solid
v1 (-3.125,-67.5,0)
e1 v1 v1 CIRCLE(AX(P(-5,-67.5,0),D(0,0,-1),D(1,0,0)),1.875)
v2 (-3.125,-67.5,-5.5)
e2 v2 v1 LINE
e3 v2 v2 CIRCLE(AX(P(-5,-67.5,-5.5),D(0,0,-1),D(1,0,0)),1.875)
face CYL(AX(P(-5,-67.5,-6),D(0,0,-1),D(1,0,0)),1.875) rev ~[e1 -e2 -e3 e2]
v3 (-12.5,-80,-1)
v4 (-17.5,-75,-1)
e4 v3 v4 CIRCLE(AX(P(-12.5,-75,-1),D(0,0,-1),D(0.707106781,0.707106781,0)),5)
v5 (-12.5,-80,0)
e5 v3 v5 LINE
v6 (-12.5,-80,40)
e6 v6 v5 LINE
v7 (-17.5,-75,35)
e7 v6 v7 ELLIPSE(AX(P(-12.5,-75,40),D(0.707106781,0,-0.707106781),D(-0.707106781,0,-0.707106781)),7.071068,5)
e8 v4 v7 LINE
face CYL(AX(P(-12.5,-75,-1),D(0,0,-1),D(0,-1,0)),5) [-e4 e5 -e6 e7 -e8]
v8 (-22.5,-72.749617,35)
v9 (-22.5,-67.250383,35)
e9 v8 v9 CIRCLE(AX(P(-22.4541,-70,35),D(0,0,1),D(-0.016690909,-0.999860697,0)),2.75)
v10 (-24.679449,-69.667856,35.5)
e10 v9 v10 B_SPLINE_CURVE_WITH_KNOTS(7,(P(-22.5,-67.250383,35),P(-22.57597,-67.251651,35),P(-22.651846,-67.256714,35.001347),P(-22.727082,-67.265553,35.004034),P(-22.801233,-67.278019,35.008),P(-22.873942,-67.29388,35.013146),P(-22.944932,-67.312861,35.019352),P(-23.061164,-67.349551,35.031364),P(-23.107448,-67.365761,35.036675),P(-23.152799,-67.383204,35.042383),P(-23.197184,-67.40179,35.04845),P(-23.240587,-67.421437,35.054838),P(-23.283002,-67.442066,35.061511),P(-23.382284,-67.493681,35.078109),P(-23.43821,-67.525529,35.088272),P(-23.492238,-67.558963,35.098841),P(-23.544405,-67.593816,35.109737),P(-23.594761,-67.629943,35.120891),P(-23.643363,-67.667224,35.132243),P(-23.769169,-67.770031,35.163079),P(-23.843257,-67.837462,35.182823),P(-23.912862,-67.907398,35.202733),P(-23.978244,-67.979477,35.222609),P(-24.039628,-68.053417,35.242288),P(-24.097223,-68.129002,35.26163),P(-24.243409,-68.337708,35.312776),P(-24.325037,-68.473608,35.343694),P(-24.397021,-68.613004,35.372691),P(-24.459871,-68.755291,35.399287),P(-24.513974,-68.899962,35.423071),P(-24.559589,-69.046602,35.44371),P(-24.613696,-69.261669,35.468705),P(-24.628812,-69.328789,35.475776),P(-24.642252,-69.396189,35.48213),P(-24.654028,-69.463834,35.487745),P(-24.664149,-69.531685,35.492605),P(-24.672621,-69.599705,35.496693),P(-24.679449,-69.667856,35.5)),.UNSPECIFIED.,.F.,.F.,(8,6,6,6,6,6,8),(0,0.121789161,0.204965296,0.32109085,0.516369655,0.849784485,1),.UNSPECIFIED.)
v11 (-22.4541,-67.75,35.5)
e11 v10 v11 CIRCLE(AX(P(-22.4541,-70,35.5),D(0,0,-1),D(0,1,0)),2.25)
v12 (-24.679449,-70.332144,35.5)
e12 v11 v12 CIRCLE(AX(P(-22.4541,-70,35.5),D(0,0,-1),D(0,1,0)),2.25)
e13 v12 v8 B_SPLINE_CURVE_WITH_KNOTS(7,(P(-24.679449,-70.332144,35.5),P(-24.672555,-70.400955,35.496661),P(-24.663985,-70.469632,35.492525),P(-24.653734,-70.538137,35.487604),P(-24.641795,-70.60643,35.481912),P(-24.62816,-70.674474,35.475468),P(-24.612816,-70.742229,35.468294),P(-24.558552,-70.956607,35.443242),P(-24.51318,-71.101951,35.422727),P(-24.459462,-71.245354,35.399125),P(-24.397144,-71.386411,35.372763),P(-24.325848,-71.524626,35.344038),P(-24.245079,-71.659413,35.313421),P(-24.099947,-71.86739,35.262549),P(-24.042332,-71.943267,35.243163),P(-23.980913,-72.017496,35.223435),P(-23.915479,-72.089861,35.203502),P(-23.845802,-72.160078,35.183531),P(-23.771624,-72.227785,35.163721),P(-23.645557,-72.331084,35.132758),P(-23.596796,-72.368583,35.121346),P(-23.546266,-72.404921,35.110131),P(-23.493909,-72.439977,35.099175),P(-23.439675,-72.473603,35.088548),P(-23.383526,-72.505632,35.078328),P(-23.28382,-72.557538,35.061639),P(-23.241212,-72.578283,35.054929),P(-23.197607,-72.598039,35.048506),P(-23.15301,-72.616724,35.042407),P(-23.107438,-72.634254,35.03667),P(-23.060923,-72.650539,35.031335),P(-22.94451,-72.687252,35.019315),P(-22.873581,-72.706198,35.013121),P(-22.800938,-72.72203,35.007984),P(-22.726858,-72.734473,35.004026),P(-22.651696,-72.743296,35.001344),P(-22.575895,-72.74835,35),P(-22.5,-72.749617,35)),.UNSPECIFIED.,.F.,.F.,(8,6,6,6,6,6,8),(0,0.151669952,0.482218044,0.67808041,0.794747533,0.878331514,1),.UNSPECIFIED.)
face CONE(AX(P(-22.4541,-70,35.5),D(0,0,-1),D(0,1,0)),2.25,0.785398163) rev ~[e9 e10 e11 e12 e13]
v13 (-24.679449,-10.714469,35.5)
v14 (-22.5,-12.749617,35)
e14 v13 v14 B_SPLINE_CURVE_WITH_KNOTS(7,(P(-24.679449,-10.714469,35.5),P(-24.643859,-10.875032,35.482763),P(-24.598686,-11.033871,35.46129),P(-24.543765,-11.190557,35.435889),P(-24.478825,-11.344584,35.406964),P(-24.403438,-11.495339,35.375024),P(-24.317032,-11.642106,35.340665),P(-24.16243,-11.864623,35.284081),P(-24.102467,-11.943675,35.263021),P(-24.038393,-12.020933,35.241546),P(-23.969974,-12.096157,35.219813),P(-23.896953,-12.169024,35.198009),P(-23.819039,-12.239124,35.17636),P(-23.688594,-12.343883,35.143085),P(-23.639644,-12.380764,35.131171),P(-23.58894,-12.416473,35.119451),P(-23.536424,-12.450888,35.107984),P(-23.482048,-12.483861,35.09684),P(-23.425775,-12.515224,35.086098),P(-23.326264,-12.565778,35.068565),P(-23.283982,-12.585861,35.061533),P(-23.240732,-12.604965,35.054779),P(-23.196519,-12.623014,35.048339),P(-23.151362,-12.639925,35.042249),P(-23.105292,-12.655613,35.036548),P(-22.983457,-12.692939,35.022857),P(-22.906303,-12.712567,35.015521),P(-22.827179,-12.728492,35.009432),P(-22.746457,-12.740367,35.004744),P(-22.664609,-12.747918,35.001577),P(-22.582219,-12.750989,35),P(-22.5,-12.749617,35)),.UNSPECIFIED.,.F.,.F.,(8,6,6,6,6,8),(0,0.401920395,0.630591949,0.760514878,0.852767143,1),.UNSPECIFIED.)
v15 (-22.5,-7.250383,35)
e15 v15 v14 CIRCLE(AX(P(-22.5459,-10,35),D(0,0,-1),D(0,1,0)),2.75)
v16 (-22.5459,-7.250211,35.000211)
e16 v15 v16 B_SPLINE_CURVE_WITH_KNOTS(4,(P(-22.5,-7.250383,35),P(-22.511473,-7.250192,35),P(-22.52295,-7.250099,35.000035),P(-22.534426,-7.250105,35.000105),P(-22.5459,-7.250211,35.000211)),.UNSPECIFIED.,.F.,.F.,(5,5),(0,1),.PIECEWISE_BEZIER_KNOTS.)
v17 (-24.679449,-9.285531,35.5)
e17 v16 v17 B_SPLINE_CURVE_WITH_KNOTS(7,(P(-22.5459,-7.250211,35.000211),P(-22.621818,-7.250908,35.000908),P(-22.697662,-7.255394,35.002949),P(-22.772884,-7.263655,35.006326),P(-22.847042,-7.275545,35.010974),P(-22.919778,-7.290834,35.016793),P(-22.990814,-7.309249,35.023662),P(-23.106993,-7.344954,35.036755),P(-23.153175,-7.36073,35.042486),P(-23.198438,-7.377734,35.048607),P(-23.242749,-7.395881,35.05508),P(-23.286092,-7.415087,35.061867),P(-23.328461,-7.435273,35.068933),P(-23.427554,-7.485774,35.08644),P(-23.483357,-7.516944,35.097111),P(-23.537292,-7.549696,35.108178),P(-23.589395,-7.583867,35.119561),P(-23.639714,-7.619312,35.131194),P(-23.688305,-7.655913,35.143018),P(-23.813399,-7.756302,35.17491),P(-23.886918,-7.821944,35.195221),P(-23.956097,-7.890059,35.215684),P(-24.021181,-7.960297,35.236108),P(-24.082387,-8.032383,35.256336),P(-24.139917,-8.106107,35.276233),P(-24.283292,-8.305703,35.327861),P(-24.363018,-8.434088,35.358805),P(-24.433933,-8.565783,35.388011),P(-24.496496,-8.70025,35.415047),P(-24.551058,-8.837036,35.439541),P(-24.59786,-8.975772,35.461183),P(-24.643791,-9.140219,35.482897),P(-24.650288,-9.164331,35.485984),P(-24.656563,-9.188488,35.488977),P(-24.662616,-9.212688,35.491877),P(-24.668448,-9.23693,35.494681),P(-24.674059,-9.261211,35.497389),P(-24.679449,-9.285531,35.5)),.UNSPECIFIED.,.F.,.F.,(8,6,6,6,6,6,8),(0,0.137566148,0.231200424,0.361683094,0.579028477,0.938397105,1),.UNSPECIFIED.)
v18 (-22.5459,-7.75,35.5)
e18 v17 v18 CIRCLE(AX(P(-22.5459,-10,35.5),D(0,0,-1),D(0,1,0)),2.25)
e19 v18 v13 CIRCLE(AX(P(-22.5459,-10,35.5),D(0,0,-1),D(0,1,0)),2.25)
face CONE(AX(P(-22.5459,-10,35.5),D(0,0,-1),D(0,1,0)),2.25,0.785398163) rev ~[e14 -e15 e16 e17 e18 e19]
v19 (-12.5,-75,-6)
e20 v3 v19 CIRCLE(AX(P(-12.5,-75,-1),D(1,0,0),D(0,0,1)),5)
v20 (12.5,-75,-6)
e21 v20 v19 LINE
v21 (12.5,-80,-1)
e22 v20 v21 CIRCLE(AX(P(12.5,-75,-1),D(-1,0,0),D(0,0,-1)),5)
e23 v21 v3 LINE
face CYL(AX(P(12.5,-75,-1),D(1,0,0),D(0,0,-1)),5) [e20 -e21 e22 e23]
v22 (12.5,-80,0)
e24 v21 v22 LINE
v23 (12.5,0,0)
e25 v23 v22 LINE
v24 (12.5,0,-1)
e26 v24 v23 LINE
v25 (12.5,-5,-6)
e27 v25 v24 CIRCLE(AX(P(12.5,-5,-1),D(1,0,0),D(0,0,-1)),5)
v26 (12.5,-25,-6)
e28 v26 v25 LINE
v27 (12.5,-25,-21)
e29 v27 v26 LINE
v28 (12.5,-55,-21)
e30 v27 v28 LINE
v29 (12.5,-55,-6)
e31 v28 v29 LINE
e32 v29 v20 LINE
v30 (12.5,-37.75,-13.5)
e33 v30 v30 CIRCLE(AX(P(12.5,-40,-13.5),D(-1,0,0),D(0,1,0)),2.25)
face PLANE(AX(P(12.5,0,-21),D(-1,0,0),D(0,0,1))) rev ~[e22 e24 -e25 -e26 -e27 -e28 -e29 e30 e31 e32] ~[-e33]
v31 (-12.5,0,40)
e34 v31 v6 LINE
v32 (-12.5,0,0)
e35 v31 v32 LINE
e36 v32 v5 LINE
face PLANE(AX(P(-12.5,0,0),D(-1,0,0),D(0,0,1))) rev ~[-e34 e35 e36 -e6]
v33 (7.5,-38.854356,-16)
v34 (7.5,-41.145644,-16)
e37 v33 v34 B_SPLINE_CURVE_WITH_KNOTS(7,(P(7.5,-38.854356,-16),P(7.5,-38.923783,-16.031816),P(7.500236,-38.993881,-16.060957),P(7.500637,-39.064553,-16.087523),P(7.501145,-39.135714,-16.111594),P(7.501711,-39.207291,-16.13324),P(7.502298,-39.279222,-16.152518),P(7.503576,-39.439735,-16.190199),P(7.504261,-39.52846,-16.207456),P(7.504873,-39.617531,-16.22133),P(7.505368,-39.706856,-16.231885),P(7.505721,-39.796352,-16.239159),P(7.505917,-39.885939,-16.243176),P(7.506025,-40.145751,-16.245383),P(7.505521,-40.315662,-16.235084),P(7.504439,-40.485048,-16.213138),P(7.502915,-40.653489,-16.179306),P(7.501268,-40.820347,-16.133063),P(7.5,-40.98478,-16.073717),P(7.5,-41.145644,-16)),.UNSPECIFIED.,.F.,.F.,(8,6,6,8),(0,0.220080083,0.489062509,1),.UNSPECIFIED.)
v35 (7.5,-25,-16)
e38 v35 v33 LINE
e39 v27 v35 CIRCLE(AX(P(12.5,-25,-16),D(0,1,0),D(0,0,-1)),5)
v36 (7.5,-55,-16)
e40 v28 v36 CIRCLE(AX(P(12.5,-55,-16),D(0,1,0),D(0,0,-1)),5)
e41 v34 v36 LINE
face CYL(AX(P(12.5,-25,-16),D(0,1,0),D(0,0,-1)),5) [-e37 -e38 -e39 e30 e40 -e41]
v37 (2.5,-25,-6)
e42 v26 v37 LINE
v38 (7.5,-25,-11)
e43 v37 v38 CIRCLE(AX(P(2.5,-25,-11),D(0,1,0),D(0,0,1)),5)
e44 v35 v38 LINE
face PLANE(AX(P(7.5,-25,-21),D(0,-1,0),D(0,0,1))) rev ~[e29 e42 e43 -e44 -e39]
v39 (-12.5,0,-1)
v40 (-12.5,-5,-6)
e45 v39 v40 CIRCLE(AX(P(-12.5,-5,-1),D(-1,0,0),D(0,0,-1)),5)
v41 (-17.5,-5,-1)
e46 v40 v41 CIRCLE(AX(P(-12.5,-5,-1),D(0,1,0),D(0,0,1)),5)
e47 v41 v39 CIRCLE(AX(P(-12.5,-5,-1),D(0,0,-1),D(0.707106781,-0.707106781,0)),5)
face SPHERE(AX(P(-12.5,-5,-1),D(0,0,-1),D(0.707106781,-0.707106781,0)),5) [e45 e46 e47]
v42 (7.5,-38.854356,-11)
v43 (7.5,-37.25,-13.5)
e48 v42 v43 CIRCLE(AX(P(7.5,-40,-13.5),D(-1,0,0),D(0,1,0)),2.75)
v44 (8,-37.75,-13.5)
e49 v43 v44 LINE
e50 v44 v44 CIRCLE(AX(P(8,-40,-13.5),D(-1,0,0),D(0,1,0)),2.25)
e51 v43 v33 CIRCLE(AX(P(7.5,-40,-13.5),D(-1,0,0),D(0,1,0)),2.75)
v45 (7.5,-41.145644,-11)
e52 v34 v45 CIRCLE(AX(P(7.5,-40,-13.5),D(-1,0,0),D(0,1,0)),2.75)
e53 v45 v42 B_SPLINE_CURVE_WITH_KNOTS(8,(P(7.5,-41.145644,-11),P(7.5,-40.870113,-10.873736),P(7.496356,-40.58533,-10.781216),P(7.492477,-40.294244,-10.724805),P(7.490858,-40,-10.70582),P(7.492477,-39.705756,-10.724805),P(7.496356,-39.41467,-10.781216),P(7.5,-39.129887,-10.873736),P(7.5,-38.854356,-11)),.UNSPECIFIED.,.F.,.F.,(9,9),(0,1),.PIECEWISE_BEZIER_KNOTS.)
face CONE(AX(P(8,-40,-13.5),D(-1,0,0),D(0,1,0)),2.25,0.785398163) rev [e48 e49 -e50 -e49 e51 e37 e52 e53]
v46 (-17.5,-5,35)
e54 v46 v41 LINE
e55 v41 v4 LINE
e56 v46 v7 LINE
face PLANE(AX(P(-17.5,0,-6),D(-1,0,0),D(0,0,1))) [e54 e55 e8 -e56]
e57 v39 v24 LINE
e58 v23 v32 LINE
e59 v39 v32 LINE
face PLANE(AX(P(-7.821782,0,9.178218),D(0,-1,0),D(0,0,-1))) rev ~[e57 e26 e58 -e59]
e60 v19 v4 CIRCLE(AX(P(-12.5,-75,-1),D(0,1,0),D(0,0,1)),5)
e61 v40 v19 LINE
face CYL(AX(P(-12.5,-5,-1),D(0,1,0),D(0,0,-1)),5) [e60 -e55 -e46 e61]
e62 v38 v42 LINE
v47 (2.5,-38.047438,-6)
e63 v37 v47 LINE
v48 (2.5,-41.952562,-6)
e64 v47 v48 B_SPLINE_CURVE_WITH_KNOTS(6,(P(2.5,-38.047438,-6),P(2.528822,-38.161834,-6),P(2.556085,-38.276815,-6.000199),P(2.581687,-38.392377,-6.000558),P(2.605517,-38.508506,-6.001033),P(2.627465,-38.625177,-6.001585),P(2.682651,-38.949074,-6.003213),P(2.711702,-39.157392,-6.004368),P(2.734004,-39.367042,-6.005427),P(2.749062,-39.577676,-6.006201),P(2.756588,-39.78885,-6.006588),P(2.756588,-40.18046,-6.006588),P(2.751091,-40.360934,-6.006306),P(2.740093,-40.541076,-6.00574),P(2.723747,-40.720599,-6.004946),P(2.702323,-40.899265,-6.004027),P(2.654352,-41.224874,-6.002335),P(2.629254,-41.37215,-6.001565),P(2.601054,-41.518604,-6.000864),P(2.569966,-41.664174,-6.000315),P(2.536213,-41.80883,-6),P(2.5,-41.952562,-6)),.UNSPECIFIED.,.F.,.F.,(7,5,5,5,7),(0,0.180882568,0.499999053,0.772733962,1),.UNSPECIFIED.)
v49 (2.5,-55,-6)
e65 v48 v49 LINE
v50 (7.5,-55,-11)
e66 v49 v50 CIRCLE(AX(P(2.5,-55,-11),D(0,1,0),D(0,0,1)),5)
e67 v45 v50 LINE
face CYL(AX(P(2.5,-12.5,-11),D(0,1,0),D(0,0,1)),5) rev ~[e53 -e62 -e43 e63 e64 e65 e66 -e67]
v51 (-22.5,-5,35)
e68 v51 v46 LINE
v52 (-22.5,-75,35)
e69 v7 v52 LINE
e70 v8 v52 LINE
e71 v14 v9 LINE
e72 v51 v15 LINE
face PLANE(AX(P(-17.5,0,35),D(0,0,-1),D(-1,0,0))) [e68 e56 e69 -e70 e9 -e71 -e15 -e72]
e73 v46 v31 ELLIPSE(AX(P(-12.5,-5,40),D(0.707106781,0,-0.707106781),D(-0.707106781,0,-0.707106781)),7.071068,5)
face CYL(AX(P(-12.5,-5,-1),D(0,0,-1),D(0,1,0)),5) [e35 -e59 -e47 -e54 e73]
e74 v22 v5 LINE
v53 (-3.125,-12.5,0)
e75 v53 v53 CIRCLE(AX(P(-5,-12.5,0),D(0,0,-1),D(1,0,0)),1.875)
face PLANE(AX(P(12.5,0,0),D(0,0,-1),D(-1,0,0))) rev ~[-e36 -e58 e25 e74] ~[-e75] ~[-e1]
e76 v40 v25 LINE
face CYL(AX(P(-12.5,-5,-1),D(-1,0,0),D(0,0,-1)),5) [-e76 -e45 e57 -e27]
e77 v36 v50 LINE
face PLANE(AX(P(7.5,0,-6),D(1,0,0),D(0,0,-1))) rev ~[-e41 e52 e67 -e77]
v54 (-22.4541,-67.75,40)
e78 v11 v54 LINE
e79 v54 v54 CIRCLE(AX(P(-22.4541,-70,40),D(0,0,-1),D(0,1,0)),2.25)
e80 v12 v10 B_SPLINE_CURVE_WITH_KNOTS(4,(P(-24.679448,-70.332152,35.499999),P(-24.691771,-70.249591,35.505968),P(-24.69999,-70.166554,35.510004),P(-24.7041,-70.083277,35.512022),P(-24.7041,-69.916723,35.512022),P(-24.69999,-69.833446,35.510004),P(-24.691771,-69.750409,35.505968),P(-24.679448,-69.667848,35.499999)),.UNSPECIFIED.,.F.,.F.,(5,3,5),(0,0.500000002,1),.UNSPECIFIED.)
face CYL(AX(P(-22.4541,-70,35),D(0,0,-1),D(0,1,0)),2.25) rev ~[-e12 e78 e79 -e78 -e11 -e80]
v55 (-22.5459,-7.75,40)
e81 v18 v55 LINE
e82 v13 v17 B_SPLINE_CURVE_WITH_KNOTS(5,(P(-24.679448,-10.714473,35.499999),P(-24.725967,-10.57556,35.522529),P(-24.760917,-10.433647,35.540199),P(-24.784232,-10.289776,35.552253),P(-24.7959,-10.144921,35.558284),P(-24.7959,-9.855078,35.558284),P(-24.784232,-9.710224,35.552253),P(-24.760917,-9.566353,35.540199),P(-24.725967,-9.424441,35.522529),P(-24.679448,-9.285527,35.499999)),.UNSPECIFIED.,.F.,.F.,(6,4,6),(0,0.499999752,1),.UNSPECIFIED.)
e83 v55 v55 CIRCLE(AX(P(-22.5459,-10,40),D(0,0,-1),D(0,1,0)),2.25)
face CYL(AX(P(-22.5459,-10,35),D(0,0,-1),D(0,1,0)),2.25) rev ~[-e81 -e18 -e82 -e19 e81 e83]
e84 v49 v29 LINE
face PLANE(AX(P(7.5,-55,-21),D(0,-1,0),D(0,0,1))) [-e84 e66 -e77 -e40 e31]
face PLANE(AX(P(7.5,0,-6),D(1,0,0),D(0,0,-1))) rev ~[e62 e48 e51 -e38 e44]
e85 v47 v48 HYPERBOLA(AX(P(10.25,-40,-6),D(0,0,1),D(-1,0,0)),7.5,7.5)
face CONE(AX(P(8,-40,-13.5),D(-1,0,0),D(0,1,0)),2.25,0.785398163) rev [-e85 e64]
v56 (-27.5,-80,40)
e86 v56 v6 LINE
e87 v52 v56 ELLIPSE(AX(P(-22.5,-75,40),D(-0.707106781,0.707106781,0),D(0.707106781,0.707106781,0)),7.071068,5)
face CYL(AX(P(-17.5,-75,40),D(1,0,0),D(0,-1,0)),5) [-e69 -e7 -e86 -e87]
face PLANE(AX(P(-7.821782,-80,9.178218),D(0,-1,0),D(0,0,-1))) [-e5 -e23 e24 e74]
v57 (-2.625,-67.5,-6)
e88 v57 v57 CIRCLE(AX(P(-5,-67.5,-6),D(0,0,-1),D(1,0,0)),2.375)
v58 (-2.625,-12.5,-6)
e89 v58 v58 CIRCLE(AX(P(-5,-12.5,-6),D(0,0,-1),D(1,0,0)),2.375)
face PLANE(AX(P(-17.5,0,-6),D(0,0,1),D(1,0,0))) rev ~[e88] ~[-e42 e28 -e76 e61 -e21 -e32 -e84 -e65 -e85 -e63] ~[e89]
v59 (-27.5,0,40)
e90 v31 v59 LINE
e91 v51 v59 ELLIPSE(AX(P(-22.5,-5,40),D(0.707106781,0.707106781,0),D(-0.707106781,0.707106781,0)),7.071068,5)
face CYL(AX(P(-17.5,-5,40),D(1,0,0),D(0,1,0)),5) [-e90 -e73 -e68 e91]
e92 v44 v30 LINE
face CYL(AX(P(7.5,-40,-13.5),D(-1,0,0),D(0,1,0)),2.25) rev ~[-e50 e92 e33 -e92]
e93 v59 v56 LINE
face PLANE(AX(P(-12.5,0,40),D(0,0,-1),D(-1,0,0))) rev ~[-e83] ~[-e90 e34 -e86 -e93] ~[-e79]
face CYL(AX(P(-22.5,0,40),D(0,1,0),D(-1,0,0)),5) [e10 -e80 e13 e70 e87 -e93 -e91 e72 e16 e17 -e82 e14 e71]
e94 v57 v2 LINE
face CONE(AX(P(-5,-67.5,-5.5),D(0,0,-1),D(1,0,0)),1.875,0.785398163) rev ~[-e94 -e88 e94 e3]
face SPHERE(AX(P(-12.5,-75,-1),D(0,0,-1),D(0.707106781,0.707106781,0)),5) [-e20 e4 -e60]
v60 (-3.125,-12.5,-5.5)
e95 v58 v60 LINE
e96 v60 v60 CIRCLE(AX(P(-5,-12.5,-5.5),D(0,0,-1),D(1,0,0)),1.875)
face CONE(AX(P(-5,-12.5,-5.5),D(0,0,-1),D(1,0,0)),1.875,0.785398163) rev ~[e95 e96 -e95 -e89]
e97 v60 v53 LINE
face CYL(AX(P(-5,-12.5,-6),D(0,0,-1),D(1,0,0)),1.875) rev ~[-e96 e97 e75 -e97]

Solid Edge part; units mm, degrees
sketch "Sketch1" plane through (0, 0, 0) normal (0, -1, 0) x (1, 0, 0)
  line L0 (-17.5, -6) -> (7.5, -6)
  line L1 (7.5, -6) -> (7.5, -21)
  line L2 (7.5, -21) -> (12.5, -21)
  line L3 (12.5, -21) -> (12.5, 0)
  line L4 (12.5, 0) -> (-12.5, 0)
  line L5 (-12.5, 0) -> (-12.5, 40)
  line L6 (-12.5, 40) -> (-27.5, 40)
  line L7 (-27.5, 35) -> (-27.5, 40)
  line L8 (-17.5, 35) -> (-27.5, 35)
  line L9 (-17.5, -6) -> (-17.5, 35)
  dimension "D1" = 5
  dimension "D2" = 6
  dimension "D3" = 15
  dimension "D4" = 40
  dimension "D5" = 10
  dimension "D6" = 40
  dimension "D7" = 5
  dimension "D8" = 5
extrude "Protrusion1" add sketch "Sketch1" along normal blind 80
sketch "Sketch2" plane through (7.5, -40, -13.5) normal (-1, 0, 0) x (0, 1, 0)
  circle A0 centre (0, 0) radius 2.25
extrude "Cutout1" cut sketch "Sketch2" against normal through all
sketch "Sketch3" plane through (-22.5, -40, 35) normal (0, 0, -1) x (0, 1, 0)
  circle A0 centre (-30, 0.0459) radius 2.25
  circle A1 centre (30, -0.0459) radius 2.25
  dimension "D1" = 60
  dimension "D2" = 4.5
extrude "Cutout2" cut sketch "Sketch3" against normal through all
sketch "Sketch4" plane through (-5, -40, -6) normal (0, 0, -1) x (1, 0, 0)
  circle A0 centre (0, 27.5) radius 1.875
  circle A1 centre (0, -27.5) radius 1.875
  dimension "D1" = 55
extrude "Cutout3" cut sketch "Sketch4" against normal through all
sketch "Sketch5" plane through (7.5, -40, -13.5) normal (-1, 0, 0) x (0, 1, 0)
  line L0 (-40, 7.5) -> (-15, 7.5)
  line L1 (-15, 7.5) -> (-15, -7.5)
  line L2 (-15, -7.5) -> (-40, -7.5)
  line L3 (-40, -7.5) -> (-40, 7.5)
  line L4 (40, 7.5) -> (15, 7.5)
  line L5 (15, 7.5) -> (15, -7.5)
  line L6 (15, -7.5) -> (40, -7.5)
  line L7 (40, -7.5) -> (40, 7.5)
  dimension "D1" = 25
extrude "Cutout4" cut sketch "Sketch5" against normal through all
chamfer "Fase_3" distance 0.5 angle 45 5 edges at (-6.875, -67.5, -6) (-6.875, -12.5, -6) (-22.5459, -12.25, 35) (-22.4541, -72.25, 35) (7.5, -42.25, -13.5)
fillet "Verrundung_3" radius 5 10 edges at (-27.5, -40, 35) (-17.5, -40, -6) (7.5, -40, -6) (7.5, -40, -21) (-17.5, -80, 14.5) (-2.5, -80, -6) (-22.5, -80, 35) (-17.5, 0, 14.5) (-22.5, 0, 35) (-2.5, 0, -6)
properties material "Nylon, allgemein"
